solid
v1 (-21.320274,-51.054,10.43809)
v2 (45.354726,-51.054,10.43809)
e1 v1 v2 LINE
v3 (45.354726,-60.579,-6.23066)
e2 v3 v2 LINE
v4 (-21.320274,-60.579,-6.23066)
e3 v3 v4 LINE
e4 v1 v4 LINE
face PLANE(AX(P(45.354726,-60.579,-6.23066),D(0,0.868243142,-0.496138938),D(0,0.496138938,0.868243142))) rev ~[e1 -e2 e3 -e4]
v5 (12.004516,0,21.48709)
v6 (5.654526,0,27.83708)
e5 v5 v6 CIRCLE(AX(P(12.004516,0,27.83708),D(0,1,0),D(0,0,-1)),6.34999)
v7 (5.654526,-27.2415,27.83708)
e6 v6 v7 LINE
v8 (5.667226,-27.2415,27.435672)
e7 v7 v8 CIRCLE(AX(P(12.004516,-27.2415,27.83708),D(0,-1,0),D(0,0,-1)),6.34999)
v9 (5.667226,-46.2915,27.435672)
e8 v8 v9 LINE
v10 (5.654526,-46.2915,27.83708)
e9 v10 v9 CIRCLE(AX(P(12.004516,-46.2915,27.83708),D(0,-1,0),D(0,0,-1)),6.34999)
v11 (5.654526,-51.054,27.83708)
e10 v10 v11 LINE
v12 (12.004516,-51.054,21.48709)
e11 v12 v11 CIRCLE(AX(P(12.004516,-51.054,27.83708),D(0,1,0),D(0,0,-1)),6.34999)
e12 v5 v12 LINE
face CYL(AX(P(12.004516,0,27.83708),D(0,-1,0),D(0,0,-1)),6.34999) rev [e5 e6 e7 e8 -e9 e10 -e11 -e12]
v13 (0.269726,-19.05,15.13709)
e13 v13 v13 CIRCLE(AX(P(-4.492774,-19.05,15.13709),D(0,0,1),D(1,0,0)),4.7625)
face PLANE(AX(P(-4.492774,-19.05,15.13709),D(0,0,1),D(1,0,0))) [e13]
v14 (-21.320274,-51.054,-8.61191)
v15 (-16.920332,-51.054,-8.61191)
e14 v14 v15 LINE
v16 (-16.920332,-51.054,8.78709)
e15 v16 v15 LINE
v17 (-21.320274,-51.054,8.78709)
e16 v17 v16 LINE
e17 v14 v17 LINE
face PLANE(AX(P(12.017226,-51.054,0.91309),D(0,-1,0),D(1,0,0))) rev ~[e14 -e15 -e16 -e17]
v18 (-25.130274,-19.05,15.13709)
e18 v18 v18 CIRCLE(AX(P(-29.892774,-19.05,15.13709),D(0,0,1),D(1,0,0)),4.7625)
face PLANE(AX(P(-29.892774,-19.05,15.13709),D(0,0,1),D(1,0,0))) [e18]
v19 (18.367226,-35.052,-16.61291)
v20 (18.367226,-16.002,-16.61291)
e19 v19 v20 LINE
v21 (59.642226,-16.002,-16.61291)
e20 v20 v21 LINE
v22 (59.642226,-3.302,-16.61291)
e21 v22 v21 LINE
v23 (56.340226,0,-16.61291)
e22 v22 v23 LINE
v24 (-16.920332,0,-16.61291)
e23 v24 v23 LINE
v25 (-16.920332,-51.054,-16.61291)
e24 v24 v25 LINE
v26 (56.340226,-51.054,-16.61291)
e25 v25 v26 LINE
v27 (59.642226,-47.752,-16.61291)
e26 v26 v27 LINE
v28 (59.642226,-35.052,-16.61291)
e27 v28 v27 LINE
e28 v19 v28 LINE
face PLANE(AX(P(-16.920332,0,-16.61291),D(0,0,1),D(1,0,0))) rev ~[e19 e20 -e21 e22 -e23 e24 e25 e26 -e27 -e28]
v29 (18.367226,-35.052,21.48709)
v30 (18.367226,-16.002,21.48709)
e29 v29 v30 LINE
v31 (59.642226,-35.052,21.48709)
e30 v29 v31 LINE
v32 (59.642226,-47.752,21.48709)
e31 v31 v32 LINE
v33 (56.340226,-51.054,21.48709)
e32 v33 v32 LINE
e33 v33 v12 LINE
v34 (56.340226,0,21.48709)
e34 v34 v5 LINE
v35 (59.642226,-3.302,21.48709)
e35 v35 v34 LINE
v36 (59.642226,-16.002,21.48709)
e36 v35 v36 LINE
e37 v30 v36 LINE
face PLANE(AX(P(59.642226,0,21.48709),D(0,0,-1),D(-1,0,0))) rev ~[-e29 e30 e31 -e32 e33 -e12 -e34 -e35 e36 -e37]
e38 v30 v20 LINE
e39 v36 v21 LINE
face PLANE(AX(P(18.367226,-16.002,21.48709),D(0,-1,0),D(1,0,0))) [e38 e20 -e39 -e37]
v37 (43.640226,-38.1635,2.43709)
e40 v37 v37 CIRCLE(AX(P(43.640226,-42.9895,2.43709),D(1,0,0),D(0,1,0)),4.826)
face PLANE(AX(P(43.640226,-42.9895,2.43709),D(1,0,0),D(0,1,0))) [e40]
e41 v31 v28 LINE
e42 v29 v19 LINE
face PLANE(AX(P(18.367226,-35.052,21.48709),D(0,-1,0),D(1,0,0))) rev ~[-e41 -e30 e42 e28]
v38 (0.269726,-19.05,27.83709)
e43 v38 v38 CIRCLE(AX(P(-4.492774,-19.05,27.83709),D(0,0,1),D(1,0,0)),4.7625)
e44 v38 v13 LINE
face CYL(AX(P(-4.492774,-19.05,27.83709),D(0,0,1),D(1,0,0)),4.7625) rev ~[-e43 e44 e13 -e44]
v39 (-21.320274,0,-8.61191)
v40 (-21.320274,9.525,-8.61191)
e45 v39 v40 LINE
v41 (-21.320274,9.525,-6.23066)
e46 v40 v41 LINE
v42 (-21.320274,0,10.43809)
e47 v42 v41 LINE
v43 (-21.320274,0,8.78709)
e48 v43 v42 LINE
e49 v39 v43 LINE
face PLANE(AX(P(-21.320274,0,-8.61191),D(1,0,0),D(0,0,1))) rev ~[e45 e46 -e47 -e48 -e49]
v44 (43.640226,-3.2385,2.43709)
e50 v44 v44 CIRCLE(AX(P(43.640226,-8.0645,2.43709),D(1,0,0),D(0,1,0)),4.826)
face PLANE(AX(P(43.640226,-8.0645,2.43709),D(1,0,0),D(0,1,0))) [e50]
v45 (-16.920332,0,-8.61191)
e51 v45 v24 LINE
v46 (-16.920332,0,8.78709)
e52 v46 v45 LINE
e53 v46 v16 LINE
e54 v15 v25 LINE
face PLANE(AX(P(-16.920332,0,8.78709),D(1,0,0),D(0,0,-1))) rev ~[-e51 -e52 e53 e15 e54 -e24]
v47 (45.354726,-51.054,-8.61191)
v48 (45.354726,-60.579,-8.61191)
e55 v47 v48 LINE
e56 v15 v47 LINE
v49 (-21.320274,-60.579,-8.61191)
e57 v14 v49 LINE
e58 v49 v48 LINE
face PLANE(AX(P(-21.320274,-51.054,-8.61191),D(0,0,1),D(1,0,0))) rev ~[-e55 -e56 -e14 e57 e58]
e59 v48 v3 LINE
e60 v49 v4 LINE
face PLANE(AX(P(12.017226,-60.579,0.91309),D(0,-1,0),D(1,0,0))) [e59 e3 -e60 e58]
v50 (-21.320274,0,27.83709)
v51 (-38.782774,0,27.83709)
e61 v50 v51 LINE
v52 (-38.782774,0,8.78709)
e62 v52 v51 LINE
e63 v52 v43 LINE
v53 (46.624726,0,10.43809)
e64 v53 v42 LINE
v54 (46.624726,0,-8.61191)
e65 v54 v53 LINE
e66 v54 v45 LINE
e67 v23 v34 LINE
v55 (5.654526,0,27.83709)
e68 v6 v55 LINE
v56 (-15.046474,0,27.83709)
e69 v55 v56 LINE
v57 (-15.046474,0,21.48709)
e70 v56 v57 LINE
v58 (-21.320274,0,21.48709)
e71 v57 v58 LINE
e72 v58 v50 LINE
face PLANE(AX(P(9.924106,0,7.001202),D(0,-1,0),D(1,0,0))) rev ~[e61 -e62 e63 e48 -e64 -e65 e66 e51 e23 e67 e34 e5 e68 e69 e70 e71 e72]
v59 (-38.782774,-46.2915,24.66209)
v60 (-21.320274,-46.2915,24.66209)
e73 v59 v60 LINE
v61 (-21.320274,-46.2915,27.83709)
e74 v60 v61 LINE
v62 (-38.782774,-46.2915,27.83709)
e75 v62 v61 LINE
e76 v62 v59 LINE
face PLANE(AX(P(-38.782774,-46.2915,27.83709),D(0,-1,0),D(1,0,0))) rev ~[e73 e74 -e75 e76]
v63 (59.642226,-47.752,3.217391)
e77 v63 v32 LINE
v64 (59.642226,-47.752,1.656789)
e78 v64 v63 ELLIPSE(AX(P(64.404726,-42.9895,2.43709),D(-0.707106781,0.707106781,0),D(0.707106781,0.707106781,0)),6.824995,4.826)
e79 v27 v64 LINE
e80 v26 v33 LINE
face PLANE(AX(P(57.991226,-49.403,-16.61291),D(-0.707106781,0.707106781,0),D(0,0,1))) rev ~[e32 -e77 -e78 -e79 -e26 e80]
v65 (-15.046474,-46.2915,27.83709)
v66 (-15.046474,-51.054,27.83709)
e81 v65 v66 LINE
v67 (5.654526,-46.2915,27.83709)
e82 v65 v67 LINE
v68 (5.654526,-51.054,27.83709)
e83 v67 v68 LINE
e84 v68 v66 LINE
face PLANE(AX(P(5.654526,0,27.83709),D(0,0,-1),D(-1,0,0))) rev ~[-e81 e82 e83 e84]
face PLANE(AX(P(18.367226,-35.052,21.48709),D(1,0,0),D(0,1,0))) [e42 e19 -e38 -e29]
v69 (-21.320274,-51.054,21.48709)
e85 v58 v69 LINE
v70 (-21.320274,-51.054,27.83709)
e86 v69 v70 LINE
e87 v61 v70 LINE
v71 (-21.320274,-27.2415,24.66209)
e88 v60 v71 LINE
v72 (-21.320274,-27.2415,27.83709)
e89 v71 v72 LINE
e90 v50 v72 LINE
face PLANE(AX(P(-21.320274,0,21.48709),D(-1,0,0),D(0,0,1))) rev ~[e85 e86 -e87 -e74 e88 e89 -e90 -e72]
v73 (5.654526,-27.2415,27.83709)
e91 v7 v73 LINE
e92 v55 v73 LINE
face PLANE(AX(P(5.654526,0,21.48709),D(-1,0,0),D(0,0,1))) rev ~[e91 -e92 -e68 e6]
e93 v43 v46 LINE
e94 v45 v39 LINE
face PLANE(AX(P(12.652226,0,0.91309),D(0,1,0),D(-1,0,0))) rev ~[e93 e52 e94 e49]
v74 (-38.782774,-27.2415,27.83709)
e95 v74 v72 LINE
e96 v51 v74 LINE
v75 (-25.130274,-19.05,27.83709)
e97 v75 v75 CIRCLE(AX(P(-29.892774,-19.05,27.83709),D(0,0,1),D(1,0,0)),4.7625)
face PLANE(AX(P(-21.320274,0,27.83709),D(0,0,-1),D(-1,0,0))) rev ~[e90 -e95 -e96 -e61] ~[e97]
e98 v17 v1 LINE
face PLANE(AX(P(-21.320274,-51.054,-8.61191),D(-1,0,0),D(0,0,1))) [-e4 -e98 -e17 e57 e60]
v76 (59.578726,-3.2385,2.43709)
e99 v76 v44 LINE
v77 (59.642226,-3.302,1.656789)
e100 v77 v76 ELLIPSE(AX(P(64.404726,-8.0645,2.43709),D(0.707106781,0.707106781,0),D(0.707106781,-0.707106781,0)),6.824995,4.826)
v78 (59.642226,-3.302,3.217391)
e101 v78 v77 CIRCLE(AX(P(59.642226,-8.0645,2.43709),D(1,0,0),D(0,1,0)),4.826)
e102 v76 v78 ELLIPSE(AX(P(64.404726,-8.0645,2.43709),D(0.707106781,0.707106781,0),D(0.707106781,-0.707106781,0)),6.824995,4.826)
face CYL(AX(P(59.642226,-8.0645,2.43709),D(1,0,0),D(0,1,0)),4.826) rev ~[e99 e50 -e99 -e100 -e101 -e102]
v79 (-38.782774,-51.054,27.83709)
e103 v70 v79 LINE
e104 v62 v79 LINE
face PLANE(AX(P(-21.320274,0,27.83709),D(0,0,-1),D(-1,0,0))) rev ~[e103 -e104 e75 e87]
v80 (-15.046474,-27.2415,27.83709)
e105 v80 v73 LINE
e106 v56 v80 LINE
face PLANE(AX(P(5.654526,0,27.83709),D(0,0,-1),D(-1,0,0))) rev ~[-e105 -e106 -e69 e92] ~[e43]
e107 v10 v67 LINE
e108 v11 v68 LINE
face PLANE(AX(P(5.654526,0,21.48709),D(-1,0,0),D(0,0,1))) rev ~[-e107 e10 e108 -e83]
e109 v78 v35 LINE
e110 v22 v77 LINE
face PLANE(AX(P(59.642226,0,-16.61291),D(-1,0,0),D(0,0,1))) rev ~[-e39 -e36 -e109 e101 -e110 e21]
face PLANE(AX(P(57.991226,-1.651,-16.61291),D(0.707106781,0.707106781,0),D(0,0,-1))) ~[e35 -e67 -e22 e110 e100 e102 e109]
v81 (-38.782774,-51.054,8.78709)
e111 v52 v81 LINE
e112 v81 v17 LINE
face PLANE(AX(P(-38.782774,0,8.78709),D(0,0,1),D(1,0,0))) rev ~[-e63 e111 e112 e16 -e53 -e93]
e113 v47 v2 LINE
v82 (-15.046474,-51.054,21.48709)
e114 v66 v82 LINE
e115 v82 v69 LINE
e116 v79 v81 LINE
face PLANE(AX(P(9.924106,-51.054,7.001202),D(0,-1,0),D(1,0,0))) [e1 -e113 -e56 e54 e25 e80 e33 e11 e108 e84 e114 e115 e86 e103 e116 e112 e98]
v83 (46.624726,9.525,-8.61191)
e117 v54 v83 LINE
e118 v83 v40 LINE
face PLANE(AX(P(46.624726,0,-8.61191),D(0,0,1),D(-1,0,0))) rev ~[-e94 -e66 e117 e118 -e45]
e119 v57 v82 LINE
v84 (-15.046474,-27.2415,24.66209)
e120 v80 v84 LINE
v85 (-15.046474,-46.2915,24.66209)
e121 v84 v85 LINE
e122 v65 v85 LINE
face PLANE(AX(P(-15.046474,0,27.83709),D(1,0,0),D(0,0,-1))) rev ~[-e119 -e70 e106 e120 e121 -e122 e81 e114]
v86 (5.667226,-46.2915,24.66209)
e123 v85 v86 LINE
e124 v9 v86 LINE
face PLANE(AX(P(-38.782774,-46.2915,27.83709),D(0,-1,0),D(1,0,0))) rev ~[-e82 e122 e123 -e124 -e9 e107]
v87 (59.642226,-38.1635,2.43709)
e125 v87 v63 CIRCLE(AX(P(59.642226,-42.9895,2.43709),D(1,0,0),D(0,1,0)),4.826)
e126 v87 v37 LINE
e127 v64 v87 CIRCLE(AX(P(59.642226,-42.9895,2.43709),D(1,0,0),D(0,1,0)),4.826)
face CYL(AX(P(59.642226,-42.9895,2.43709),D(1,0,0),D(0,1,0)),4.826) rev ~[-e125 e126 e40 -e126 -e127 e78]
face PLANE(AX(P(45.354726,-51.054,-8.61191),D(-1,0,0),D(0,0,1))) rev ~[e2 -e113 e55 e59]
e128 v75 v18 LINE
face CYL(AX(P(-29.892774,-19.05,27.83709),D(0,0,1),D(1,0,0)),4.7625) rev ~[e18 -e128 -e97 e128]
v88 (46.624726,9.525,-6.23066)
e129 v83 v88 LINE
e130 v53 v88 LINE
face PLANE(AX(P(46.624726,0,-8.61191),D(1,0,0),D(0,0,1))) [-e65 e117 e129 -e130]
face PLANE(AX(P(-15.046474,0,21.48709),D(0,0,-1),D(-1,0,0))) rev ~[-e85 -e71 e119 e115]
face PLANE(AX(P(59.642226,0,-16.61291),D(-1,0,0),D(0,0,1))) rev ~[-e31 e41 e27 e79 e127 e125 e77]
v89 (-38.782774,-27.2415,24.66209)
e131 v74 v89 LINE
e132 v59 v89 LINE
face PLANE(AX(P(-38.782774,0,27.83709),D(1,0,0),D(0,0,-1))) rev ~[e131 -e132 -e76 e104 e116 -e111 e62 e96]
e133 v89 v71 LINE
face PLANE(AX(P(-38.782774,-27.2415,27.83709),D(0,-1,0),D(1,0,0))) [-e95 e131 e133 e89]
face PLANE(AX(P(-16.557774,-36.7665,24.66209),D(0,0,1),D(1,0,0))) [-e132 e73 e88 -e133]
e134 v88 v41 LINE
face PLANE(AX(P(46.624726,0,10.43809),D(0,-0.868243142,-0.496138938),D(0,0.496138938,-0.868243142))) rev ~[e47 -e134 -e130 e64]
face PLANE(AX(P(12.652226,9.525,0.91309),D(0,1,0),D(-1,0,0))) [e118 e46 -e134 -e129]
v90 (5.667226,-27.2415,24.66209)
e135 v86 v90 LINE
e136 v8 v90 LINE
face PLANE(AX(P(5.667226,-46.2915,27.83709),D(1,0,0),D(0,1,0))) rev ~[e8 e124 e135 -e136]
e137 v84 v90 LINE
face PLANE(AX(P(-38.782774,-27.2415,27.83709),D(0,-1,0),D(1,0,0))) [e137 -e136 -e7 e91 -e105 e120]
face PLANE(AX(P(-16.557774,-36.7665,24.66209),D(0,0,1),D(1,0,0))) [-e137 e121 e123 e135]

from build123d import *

# Parameters (mm, degrees)
F1_DEPTH  = 51.054
F2_R      = 6.34999
F3_W      = 41.275
F3_H      = 19.05
F4_DEPTH  = 76.2
F5_SIZE2  = 3.302
F5_SIZE   = 3.302
F6_W      = 44.45
F6_H      = 19.05
F7_DEPTH  = 3.175
F8_R      = 4.826
F9_DEPTH  = 16.002
F10_R     = 4.7625
F11_DEPTH = 12.7
F12_W     = 66.675
F12_H     = 19.05
F13_DEPTH = 9.525
F15_DEPTH = 76.2
F16_W     = 67.945
F16_H     = 19.05
F17_DEPTH = 9.525
F19_DEPTH = 85.4085


# Not quite as in the source:
# - a fillet or chamfer is up to 0.001 mm smaller than in the source, because OpenCascade refuses the exact size


with BuildPart() as f1:
    # F0 (on Front) → F1 (new body)
    with BuildSketch(Plane.XZ):
        Polygon((-38.7827743664, 8.7870896519), (-16.9203323245, 8.7870896519), (-16.9203323245, -16.6129103481), (59.6422256336, -16.6129103481), (59.6422256336, 21.4870896519), (5.6545256336, 21.4870896519), (5.6545256336, 27.8370896519), (-15.0464743664, 27.8370896519), (-15.0464743664, 21.4870896519), (-21.3202743664, 21.4870896519), (-21.3202743664, 27.8370896519), (-38.7827743664, 27.8370896519), align=None)
    extrude(amount=F1_DEPTH)

    # F2 (radius 6.35 in the source; OpenCascade refuses exactly that, so slightly less here)
    f2_edges = [f1.edges().sort_by_distance(p)[0] for p in [
        (5.654526, -25.527, 21.48709),
    ]]
    fillet(f2_edges, radius=F2_R)

    # F3 (on face) → F4 (cut)
    with BuildSketch(Plane.XY.offset(21.4870896519)):
        with Locations((39.0047256336, -25.527)):
            Rectangle(F3_W, F3_H)
    extrude(amount=-F4_DEPTH, mode=Mode.SUBTRACT)

    # F5
    f5_edges = [f1.edges().sort_by_distance(p)[0] for p in [
        (59.642226, -51.054, 2.43709),
        (59.642226, 0, 2.43709),
    ]]
    chamfer(f5_edges, length=F5_SIZE, length2=F5_SIZE2)

    # F6 (on face) → F7 (cut)
    with BuildSketch(Plane.XY.offset(27.8370896519)):
        with Locations((-16.5577743664, -36.7665)):
            Rectangle(F6_W, F6_H)
    extrude(amount=-F7_DEPTH, mode=Mode.SUBTRACT)

    # F8 (on face) → F9 (cut)
    with BuildSketch(Plane.YZ.offset(59.6422256336)):
        with Locations((-42.9895, 2.4370896519)):
            Circle(F8_R)
        with Locations((-8.0645, 2.4370896519)):
            Circle(F8_R)
    extrude(amount=-F9_DEPTH, mode=Mode.SUBTRACT)

    # F10 (on face) → F11 (cut)
    with BuildSketch(Plane.XY.offset(27.8370896519)):
        with Locations((-29.8927743664, -19.05)):
            Circle(F10_R)
        with Locations((-4.4927743664, -19.05)):
            Circle(F10_R)
    extrude(amount=-F11_DEPTH, mode=Mode.SUBTRACT)

    # F12 (on face) → F13 (join)
    with BuildSketch(Plane.XZ.offset(51.054)):
        with Locations((12.0172256336, 0.9130896519)):
            Rectangle(F12_W, F12_H)
    extrude(amount=F13_DEPTH)

    # F14 (on face) → F15 (cut)
    with BuildSketch(Plane.YZ.offset(45.3547256336)):
        Polygon((-60.579, -6.2306603481), (-51.054, 10.4380896519), (-60.579, 10.4380896519), align=None)
    extrude(amount=-F15_DEPTH, mode=Mode.SUBTRACT)

    # F16 (on face) → F17 (join)
    with BuildSketch(Plane(origin=(0, 0, 0), x_dir=(-1, 0, 0), z_dir=(0, 1, 0))):
        with Locations((-12.6522256336, 0.9130896519)):
            Rectangle(F16_W, F16_H)
    extrude(amount=F17_DEPTH)

    # F18 (on face) → F19 (cut, through all)
    with BuildSketch(Plane.YZ.offset(46.6247256336)):
        Polygon((0, 10.4380896519), (9.525, -6.2306603481), (9.525, 10.4380896519), align=None)
    extrude(amount=-F19_DEPTH, mode=Mode.SUBTRACT)


solid = f1.part
